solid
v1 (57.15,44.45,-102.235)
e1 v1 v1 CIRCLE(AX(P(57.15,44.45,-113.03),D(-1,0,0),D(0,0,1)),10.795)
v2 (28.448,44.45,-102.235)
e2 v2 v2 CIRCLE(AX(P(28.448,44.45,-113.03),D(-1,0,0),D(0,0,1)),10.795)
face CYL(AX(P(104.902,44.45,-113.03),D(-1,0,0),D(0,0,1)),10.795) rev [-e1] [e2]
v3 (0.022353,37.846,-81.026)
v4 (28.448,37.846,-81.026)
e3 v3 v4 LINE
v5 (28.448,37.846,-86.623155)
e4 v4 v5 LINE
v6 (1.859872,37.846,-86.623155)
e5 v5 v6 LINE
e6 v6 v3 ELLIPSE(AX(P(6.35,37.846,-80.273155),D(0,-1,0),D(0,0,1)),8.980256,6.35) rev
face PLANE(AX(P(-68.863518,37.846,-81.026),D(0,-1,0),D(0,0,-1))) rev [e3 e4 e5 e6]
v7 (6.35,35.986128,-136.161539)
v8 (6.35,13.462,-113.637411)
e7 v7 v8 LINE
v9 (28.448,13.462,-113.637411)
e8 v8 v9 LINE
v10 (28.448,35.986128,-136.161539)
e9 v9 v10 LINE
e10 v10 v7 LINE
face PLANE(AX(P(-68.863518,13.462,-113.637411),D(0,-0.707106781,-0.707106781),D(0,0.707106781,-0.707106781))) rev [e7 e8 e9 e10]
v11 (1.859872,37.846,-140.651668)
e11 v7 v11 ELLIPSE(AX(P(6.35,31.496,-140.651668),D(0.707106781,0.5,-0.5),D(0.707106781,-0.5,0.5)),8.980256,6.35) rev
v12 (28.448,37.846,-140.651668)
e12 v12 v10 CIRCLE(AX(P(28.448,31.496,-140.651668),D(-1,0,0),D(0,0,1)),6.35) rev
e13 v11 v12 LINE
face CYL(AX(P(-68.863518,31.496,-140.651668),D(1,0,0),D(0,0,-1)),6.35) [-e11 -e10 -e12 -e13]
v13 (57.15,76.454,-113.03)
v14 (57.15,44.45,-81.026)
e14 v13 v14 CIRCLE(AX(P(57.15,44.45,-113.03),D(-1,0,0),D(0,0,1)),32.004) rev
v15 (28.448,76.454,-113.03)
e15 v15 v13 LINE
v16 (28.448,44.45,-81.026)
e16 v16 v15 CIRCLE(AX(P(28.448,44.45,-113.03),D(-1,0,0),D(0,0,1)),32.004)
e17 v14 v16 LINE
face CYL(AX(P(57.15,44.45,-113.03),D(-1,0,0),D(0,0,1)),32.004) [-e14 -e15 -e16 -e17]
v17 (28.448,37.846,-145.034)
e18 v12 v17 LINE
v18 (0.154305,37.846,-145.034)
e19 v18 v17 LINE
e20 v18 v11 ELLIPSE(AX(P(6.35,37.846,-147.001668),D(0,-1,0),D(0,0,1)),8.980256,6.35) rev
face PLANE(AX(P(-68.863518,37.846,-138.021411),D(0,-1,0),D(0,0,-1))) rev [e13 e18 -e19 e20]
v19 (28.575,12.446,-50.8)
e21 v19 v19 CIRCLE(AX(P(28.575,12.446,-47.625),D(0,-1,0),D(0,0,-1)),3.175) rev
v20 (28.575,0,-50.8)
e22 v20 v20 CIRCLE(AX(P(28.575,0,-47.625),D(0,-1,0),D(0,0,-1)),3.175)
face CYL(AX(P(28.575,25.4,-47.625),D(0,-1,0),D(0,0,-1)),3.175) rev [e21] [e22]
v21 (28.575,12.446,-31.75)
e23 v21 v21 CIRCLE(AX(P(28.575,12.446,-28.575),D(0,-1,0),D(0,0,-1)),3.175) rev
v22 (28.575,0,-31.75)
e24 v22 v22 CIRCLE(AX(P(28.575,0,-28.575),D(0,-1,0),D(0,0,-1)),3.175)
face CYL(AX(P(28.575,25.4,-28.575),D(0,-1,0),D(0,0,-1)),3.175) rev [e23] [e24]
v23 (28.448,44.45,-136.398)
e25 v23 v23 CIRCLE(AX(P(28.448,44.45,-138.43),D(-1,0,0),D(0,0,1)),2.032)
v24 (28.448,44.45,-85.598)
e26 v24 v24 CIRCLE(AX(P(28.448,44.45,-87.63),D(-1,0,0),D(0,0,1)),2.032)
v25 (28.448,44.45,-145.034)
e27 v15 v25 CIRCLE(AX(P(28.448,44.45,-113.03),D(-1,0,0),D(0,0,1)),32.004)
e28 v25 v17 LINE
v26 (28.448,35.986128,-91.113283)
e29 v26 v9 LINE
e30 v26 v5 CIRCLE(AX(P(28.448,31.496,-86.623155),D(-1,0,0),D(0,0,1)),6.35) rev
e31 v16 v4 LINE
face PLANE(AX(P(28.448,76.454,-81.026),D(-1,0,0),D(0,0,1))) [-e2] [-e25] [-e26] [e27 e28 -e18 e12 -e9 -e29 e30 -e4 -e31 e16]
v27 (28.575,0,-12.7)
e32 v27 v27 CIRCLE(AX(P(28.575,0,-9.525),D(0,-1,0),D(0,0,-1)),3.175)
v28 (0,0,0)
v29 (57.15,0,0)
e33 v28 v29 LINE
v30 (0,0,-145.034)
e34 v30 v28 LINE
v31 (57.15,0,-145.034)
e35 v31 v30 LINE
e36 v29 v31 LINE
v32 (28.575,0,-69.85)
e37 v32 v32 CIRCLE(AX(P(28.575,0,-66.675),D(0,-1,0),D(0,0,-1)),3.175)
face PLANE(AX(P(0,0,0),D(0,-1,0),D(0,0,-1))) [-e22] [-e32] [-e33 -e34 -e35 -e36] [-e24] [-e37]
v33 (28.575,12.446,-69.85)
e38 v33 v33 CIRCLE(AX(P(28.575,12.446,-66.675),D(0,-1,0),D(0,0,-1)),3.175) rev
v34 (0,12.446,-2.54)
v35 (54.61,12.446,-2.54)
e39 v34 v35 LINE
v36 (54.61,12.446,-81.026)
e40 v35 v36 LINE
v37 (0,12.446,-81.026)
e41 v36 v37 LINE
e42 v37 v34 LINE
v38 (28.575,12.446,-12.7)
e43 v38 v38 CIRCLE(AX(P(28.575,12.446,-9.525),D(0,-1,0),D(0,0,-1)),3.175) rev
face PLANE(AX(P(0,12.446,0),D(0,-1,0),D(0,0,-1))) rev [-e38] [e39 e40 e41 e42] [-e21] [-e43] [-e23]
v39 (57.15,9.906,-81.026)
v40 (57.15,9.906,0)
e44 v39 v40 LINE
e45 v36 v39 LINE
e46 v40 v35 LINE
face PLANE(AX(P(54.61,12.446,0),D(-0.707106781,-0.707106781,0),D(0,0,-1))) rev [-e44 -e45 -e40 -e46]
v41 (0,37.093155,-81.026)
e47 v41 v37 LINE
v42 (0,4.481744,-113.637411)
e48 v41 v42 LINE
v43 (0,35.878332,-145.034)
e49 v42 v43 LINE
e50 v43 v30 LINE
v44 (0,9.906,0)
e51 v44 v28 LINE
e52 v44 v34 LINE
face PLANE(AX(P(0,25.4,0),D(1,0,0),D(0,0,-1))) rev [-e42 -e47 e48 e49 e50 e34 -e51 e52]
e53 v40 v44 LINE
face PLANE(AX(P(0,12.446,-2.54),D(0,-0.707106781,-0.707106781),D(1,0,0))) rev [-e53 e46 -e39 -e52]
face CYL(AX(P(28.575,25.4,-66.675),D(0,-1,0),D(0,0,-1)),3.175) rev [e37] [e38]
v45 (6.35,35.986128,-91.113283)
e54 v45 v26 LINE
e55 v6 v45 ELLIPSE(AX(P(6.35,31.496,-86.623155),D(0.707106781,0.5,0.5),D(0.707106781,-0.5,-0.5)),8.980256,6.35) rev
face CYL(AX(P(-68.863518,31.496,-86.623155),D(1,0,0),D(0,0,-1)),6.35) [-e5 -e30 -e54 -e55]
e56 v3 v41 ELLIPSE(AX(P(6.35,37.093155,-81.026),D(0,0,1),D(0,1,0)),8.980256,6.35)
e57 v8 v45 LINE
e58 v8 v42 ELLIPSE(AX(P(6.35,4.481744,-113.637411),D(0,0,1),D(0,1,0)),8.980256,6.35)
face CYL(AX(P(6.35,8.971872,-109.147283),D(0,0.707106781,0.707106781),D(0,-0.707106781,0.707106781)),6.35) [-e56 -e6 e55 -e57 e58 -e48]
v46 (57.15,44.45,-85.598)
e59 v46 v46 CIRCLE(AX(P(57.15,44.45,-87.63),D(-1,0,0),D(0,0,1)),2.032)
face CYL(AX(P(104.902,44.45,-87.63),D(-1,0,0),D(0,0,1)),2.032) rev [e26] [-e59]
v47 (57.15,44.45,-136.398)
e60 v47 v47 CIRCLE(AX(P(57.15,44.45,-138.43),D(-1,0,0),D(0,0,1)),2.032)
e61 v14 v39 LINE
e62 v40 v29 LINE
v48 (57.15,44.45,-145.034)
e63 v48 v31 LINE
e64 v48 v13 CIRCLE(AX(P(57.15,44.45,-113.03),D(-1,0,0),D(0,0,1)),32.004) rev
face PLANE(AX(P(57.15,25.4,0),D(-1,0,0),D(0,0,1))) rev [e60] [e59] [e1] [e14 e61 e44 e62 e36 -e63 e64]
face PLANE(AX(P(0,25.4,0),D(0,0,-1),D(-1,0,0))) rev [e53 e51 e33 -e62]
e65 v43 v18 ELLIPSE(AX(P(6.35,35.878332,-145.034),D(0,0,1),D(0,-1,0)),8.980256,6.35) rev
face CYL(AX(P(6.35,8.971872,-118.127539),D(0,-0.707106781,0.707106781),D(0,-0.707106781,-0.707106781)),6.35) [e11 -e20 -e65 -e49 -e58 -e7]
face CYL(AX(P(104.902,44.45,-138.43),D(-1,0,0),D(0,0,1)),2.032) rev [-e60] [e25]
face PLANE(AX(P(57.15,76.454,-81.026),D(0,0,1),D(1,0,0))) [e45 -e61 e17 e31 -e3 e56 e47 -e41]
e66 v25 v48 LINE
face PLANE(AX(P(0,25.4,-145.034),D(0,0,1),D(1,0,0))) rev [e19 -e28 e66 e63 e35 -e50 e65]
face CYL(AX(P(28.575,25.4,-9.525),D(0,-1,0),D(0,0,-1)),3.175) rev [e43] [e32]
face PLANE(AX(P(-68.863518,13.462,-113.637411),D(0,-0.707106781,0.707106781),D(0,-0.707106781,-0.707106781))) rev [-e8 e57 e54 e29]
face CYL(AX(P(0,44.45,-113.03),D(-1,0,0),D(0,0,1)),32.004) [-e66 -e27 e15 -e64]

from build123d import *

# Parameters (mm, degrees)
SKETCH1_W           = 57.15
SKETCH1_H           = 145.034
BOSS_EXTRUDE1_DEPTH = 25.4
SKETCH4_R           = 3.175
CUT_EXTRUDE3_DEPTH  = 158.943482474
SKETCH7_W           = 28.702
SKETCH7_H           = 64.008
BOSS_EXTRUDE2_DEPTH = 76.454
FILLET1_R           = 32.004
SKETCH9_R           = 10.795
SKETCH9_R_2         = 2.032
CUT_EXTRUDE5_DEPTH  = 76.454
CUT_EXTRUDE7_DEPTH  = 12.954
CHAMFER1_SIZE       = 2.54
BOSS_EXTRUDE4_DEPTH = 28.448
FILLET3_R           = 6.35


# Some blends are built 0.0001 mm under size
with BuildPart() as part:
    # Sketch1 → Boss-Extrude1 (new body)
    with BuildSketch(Plane(origin=(0, 0, 0), x_dir=(1, 0, 0), z_dir=(0, 1, 0))):
        with Locations((28.575, 72.517)):
            Rectangle(SKETCH1_W, SKETCH1_H)
    extrude(amount=BOSS_EXTRUDE1_DEPTH)

    # Sketch4 → Cut-Extrude3 (cut, through all)
    with BuildSketch(Plane(origin=(0, 0, 0), x_dir=(-1, 0, 0), z_dir=(0, -1, 0))):
        with Locations(Location((-28.575, 9.525, 0), (0, 0, 90))):
            Circle(SKETCH4_R)
        with Locations(Location((-28.575, 28.575, 0), (0, 0, 90))):
            Circle(SKETCH4_R)
        with Locations(Location((-28.575, 47.625, 0), (0, 0, 90))):
            Circle(SKETCH4_R)
        with Locations(Location((-28.575, 66.675, 0), (0, 0, 90))):
            Circle(SKETCH4_R)
    extrude(amount=-CUT_EXTRUDE3_DEPTH, mode=Mode.SUBTRACT)

    # Sketch7 → Boss-Extrude2 (add)
    with BuildSketch(Plane.XZ):
        with Locations((42.799, -113.03)):
            Rectangle(SKETCH7_W, SKETCH7_H)
    extrude(amount=-BOSS_EXTRUDE2_DEPTH)

    # Fillet1
    fillet1_edges = [part.edges().sort_by_distance(p)[0] for p in [
        (42.799, 76.454, -145.034),
        (42.799, 76.454, -81.026),
    ]]
    fillet(fillet1_edges, radius=FILLET1_R - 0.0001)  # a hair under: the kernel refuses the full size

    # Sketch9 → Cut-Extrude5 (cut)
    with BuildSketch(Plane.ZY.offset(-28.448)):
        with Locations((-113.03, 44.45)):
            Circle(SKETCH9_R)
        with Locations((-138.43, 44.45)):
            Circle(SKETCH9_R_2)
        with Locations((-87.63, 44.45)):
            Circle(SKETCH9_R_2)
    extrude(amount=-CUT_EXTRUDE5_DEPTH, mode=Mode.SUBTRACT)

    # Sketch10 → Cut-Extrude7 (cut)
    with BuildSketch(Plane(origin=(0, 25.4, 0), x_dir=(1, 0, 0), z_dir=(0, 1, 0))):
        Polygon((28.448, 113.03), (28.448, 81.026), (57.15, 81.026), (57.15, 0), (50.8, 0), (0, 0), (0, 113.03), (0, 145.034), (28.448, 145.034), align=None)
    extrude(amount=-CUT_EXTRUDE7_DEPTH, mode=Mode.SUBTRACT)

    # Chamfer1
    chamfer1_edges = [part.edges().sort_by_distance(p)[0] for p in [
        (57.15, 12.446, -40.513),
        (28.575, 12.446, 0),
    ]]
    chamfer(chamfer1_edges, length=CHAMFER1_SIZE)

    # Sketch14 → Boss-Extrude4 (add)
    with BuildSketch(Plane.ZY.offset(-28.448)):
        Polygon((-113.637411412, 13.462), (-138.021411412, 37.846), (-145.034, 37.846), (-145.034, 12.446), (-81.026, 12.446), (-81.026, 37.846), (-89.253411412, 37.846), align=None)
    extrude(amount=BOSS_EXTRUDE4_DEPTH)

    # Fillet3
    # the kernel refuses this fillet: 6.35 mm, written as the material it takes off along each edge
    with BuildSketch(Plane(origin=(0, 49.071320151, -78.028091261), x_dir=(1, 0, 0), z_dir=(0, -0.707106781186549, -0.7071067811865461)), Plane(origin=(0, 13.462, -113.637411412), x_dir=(1, 0, 0), z_dir=(0, 0.7071067811865438, -0.7071067811865512))) as fillet3_piece_1:
        with BuildLine():
            CenterArc((FILLET3_R, FILLET3_R), FILLET3_R, 180, 90)
            Line((0, FILLET3_R), (0, 0))
            Line((0, 0), (FILLET3_R, 0))
        make_face()
    extrude(amount=50.359183505, mode=Mode.SUBTRACT)
    with BuildSketch(Plane(origin=(28.448, 37.846, -89.253411412), x_dir=(0, -0.7071067811865475, -0.7071067811865475), z_dir=(-1, 0, 0)), Plane(origin=(28.448, 37.846, -138.021411412), x_dir=(0, 0, -1), z_dir=(-1, 0, 0))) as fillet3_piece_2:
        with BuildLine():
            CenterArc((FILLET3_R * 0.414213562373, FILLET3_R), FILLET3_R, 225, 45)
            Line((-FILLET3_R * 0.292893218813, FILLET3_R * 0.292893218813), (0, 0))
            Line((0, 0), (FILLET3_R * 0.414213562373, 0))
        make_face()
    extrude(amount=35.023640303, mode=Mode.SUBTRACT)
    with BuildSketch(Plane(origin=(0, 2.236679849, -102.412091261), x_dir=(1, 0, 0), z_dir=(0, 0.7071067811865438, -0.7071067811865512))) as fillet3_piece_3a_section:
        with BuildLine():
            CenterArc((FILLET3_R, FILLET3_R), FILLET3_R, 180, 90)
            Line((0, FILLET3_R), (0, 0))
            Line((0, 0), (FILLET3_R, 0))
        make_face()
    fillet3_piece_3a = extrude(amount=66.234183505, mode=Mode.PRIVATE)
    fillet3_piece_3a = split(fillet3_piece_3a, bisect_by=Plane(origin=(1.437608976, 12.445456945, -114.653954468), z_dir=(0, -0.7071067811865461, 0.707106781186549)), keep=Keep.TOP, mode=Mode.PRIVATE)
    with BuildSketch(Plane(origin=(0, 49.071320151, -78.028091261), x_dir=(1, 0, 0), z_dir=(0, -0.707106781186549, -0.7071067811865461))) as fillet3_piece_3b_section:
        with BuildLine():
            CenterArc((FILLET3_R, FILLET3_R), FILLET3_R, 180, 90)
            Line((0, FILLET3_R), (0, 0))
            Line((0, 0), (FILLET3_R, 0))
        make_face()
    fillet3_piece_3b = extrude(amount=66.234183505, mode=Mode.PRIVATE)
    fillet3_piece_3b = split(fillet3_piece_3b, bisect_by=Plane(origin=(1.437608976, 12.445456945, -112.620868357), z_dir=(0, -0.7071067811865512, -0.7071067811865438)), keep=Keep.TOP, mode=Mode.PRIVATE)
    fillet3_piece_3 = fillet3_piece_3a & fillet3_piece_3b
    add(fillet3_piece_3, mode=Mode.SUBTRACT)


solid = part.part
